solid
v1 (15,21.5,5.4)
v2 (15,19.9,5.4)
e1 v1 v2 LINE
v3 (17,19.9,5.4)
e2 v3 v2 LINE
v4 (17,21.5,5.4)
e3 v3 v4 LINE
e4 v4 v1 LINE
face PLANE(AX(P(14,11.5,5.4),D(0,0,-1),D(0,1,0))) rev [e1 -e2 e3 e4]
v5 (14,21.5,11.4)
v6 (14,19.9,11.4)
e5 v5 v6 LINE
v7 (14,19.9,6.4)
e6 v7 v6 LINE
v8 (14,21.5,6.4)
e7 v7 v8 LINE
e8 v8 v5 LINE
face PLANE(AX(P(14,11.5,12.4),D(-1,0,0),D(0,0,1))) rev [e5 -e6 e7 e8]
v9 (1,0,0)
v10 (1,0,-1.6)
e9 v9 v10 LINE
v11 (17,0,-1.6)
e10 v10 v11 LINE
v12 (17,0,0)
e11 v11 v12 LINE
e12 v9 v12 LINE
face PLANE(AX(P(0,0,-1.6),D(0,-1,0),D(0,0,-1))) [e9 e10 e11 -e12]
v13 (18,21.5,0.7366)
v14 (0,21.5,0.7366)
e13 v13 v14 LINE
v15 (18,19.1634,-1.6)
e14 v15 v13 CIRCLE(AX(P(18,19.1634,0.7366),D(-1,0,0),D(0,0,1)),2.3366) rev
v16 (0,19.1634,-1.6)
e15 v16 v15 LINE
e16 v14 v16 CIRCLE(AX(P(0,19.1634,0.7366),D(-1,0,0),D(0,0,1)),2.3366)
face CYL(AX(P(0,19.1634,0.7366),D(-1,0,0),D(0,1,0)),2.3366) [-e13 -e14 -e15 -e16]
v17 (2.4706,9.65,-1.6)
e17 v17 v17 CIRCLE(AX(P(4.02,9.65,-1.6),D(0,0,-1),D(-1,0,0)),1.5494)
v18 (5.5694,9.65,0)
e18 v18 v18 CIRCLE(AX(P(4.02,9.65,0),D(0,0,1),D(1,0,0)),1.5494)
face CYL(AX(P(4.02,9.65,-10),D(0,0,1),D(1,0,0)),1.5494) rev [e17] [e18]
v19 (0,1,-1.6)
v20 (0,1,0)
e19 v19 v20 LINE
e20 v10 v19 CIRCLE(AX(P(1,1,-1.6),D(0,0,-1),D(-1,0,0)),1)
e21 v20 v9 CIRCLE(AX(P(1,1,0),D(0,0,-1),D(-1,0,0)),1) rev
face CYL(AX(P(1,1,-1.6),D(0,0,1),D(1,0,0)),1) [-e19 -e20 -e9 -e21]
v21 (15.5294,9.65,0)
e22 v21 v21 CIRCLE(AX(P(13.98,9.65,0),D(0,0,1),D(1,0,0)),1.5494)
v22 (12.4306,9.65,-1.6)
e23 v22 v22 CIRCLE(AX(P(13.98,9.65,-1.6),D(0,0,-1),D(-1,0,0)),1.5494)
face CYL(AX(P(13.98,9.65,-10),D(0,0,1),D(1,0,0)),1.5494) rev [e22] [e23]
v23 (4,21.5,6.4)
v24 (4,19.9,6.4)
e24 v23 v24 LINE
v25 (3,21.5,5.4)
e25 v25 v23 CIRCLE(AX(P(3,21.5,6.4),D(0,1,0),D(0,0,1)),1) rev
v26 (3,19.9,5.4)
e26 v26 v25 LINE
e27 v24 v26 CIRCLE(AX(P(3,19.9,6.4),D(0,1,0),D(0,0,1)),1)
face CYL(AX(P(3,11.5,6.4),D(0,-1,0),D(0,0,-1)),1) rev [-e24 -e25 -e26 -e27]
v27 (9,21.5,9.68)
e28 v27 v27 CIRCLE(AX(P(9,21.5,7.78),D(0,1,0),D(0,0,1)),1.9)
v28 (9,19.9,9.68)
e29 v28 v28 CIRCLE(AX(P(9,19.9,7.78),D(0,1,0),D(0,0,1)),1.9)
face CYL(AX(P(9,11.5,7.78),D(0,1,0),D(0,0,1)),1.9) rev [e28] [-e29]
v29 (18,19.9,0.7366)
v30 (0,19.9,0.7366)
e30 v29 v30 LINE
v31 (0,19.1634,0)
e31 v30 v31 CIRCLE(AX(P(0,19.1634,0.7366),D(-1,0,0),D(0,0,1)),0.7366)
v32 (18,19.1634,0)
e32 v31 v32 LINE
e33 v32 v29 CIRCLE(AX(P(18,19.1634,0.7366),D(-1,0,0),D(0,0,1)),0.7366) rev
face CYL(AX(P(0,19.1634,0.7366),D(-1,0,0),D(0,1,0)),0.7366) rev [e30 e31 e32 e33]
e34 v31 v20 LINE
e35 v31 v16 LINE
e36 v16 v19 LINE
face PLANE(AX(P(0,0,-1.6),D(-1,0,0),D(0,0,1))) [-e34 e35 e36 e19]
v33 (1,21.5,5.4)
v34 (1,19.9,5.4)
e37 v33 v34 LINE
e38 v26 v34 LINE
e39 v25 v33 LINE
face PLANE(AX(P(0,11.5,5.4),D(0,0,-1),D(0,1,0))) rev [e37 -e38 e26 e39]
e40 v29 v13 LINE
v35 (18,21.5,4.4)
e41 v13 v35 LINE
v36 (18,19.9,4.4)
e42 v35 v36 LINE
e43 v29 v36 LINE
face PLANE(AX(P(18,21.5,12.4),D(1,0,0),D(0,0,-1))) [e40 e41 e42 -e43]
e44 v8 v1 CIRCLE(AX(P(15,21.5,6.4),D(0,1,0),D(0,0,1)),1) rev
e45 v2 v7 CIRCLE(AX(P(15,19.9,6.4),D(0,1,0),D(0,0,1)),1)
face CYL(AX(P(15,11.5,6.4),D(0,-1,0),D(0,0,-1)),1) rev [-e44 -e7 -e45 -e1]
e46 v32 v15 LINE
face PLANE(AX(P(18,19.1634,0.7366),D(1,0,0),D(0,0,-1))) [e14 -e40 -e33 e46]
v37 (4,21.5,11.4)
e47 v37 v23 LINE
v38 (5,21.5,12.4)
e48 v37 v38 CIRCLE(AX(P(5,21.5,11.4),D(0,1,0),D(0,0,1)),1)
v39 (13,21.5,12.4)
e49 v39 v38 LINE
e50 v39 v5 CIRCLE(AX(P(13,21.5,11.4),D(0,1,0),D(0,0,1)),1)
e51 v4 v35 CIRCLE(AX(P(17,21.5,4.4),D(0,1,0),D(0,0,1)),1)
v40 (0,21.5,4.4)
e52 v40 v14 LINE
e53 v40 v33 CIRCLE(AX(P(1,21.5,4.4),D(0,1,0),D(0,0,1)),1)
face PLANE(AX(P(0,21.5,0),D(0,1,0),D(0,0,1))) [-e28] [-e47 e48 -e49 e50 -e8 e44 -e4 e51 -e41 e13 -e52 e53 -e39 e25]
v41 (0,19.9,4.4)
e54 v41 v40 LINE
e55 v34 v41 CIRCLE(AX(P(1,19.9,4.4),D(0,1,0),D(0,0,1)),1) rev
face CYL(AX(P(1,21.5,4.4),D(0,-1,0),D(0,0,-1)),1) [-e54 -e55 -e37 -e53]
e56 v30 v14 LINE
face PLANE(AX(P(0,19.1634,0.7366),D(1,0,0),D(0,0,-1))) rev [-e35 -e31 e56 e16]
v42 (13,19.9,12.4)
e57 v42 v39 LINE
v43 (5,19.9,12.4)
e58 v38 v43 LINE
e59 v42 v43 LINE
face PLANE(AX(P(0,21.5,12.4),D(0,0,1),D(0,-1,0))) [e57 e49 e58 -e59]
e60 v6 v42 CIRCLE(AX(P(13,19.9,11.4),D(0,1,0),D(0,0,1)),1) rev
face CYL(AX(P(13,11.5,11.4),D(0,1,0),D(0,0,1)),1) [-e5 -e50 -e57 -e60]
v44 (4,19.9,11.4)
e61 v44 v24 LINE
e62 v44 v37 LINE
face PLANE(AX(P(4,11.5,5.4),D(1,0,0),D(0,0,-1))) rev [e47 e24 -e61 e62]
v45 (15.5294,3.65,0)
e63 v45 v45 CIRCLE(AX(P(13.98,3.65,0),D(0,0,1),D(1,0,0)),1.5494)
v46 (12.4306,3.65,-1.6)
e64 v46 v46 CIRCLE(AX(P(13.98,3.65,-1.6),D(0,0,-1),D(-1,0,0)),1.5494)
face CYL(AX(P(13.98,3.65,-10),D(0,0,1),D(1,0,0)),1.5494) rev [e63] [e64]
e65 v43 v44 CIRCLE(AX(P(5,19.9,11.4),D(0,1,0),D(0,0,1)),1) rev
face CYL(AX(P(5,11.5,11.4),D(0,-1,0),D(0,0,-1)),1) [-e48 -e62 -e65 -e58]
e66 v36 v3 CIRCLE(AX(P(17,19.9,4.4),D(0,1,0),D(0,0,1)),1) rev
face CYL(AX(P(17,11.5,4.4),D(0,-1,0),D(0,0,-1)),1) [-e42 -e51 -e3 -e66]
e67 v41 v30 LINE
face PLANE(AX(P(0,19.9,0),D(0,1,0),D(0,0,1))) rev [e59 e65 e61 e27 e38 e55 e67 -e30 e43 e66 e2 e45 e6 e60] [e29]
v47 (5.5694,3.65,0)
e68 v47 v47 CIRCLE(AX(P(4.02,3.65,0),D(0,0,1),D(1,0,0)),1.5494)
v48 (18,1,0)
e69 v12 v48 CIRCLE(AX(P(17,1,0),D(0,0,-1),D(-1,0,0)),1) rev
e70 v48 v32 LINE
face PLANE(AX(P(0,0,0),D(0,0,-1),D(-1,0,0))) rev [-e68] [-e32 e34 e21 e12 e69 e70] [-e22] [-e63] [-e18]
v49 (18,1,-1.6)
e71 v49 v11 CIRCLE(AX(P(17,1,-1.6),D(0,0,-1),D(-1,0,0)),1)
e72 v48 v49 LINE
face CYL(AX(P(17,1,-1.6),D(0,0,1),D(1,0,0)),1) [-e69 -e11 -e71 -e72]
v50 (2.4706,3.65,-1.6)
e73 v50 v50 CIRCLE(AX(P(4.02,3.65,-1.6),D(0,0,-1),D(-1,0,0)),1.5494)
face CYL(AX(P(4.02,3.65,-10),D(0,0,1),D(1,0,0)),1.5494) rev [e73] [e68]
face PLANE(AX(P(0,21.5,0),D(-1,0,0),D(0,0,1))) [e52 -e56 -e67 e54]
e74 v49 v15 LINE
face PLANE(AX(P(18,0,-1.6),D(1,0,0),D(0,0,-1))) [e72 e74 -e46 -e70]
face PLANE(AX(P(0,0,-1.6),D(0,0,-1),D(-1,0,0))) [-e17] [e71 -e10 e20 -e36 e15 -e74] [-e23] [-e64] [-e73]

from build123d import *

# Parameters (mm, degrees)
SKETCH2_W                    = 18
SKETCH2_H                    = 21.5
BASE_FLANGE1_DEPTH           = 1.6
EDGE_FLANGE1_STRIP_W         = 7.8732
EDGE_FLANGE1_STRIP_H         = 1.6
EDGE_FLANGE1_STRIP_CUT_DEPTH = 18
EDGE_FLANGE1_DEPTH           = 18
SKETCH10_R                   = 1.9
SKETCH10_W                   = 4
SKETCH10_H                   = 7
CUT_EXTRUDE1_DEPTH           = 10
FILLET1_R                    = 1
SKETCH11_R                   = 1.5494
CUT_EXTRUDE2_DEPTH           = 10


# Sheet-metal steps are written as plain solids
with BuildPart() as part:
    # Sketch2 → Base-Flange1 (new body)
    with BuildSketch(Plane.XY):
        with Locations((9, 10.75)):
            Rectangle(SKETCH2_W, SKETCH2_H)
    extrude(amount=-BASE_FLANGE1_DEPTH)

    # Edge-Flange1 strip (across the edge) → Edge-Flange1 strip cut (cut)
    with BuildSketch(Plane(origin=(18, 21.5, 0), x_dir=(0, -1, 0), z_dir=(-1, 0, 0))):
        with Locations((-1.6, -0.8)):
            Rectangle(EDGE_FLANGE1_STRIP_W, EDGE_FLANGE1_STRIP_H)
    extrude(amount=EDGE_FLANGE1_STRIP_CUT_DEPTH, mode=Mode.SUBTRACT)

    # Edge-Flange1 section (across the edge) → Edge-Flange1 (add)
    with BuildSketch(Plane(origin=(18, 21.5, 0), x_dir=(0, -1, 0), z_dir=(-1, 0, 0))):
        with BuildLine():
            Line((0, 0.7366), (0, 12.4))
            Line((0, 12.4), (1.6, 12.4))
            Line((1.6, 12.4), (1.6, 0.7366))
            ThreePointArc((1.6, 0.7366), (1.815745145, 0.215745145), (2.3366, 0))
            Line((2.3366, 0), (2.3366, -1.6))
            ThreePointArc((2.3366, -1.6), (0.684374295, -0.915625705), (0, 0.7366))
        make_face()
    extrude(amount=EDGE_FLANGE1_DEPTH)

    # Sketch10 → Cut-Extrude1 (cut)
    with BuildSketch(Plane(origin=(0, 21.5, 0), x_dir=(1, 0, 0), z_dir=(0, 1, 0))):
        with Locations(Location((9, -7.78, 0), (0, 0, 270))):
            Circle(SKETCH10_R)
        with Locations((2, -8.9)):
            Rectangle(SKETCH10_W, SKETCH10_H)
        with Locations((16, -8.9)):
            Rectangle(SKETCH10_W, SKETCH10_H)
    extrude(amount=-CUT_EXTRUDE1_DEPTH, mode=Mode.SUBTRACT)

    # Fillet1
    fillet1_edges = [part.edges().sort_by_distance(p)[0] for p in [
        (0, 0, -0.8),
        (18, 0, -0.8),
        (0, 20.7, 5.4),
        (18, 20.7, 5.4),
        (4, 20.7, 5.4),
        (14, 20.7, 5.4),
        (14, 20.7, 12.4),
        (4, 20.7, 12.4),
    ]]
    fillet(fillet1_edges, radius=FILLET1_R)

    # Sketch11 → Cut-Extrude2 (cut)
    with BuildSketch(Plane.XY):
        with Locations((4.02, 9.65)):
            Circle(SKETCH11_R)
        with Locations((13.98, 9.65)):
            Circle(SKETCH11_R)
        with Locations((4.02, 3.65)):
            Circle(SKETCH11_R)
        with Locations((13.98, 3.65)):
            Circle(SKETCH11_R)
    extrude(amount=-CUT_EXTRUDE2_DEPTH, mode=Mode.SUBTRACT)


solid = part.part
